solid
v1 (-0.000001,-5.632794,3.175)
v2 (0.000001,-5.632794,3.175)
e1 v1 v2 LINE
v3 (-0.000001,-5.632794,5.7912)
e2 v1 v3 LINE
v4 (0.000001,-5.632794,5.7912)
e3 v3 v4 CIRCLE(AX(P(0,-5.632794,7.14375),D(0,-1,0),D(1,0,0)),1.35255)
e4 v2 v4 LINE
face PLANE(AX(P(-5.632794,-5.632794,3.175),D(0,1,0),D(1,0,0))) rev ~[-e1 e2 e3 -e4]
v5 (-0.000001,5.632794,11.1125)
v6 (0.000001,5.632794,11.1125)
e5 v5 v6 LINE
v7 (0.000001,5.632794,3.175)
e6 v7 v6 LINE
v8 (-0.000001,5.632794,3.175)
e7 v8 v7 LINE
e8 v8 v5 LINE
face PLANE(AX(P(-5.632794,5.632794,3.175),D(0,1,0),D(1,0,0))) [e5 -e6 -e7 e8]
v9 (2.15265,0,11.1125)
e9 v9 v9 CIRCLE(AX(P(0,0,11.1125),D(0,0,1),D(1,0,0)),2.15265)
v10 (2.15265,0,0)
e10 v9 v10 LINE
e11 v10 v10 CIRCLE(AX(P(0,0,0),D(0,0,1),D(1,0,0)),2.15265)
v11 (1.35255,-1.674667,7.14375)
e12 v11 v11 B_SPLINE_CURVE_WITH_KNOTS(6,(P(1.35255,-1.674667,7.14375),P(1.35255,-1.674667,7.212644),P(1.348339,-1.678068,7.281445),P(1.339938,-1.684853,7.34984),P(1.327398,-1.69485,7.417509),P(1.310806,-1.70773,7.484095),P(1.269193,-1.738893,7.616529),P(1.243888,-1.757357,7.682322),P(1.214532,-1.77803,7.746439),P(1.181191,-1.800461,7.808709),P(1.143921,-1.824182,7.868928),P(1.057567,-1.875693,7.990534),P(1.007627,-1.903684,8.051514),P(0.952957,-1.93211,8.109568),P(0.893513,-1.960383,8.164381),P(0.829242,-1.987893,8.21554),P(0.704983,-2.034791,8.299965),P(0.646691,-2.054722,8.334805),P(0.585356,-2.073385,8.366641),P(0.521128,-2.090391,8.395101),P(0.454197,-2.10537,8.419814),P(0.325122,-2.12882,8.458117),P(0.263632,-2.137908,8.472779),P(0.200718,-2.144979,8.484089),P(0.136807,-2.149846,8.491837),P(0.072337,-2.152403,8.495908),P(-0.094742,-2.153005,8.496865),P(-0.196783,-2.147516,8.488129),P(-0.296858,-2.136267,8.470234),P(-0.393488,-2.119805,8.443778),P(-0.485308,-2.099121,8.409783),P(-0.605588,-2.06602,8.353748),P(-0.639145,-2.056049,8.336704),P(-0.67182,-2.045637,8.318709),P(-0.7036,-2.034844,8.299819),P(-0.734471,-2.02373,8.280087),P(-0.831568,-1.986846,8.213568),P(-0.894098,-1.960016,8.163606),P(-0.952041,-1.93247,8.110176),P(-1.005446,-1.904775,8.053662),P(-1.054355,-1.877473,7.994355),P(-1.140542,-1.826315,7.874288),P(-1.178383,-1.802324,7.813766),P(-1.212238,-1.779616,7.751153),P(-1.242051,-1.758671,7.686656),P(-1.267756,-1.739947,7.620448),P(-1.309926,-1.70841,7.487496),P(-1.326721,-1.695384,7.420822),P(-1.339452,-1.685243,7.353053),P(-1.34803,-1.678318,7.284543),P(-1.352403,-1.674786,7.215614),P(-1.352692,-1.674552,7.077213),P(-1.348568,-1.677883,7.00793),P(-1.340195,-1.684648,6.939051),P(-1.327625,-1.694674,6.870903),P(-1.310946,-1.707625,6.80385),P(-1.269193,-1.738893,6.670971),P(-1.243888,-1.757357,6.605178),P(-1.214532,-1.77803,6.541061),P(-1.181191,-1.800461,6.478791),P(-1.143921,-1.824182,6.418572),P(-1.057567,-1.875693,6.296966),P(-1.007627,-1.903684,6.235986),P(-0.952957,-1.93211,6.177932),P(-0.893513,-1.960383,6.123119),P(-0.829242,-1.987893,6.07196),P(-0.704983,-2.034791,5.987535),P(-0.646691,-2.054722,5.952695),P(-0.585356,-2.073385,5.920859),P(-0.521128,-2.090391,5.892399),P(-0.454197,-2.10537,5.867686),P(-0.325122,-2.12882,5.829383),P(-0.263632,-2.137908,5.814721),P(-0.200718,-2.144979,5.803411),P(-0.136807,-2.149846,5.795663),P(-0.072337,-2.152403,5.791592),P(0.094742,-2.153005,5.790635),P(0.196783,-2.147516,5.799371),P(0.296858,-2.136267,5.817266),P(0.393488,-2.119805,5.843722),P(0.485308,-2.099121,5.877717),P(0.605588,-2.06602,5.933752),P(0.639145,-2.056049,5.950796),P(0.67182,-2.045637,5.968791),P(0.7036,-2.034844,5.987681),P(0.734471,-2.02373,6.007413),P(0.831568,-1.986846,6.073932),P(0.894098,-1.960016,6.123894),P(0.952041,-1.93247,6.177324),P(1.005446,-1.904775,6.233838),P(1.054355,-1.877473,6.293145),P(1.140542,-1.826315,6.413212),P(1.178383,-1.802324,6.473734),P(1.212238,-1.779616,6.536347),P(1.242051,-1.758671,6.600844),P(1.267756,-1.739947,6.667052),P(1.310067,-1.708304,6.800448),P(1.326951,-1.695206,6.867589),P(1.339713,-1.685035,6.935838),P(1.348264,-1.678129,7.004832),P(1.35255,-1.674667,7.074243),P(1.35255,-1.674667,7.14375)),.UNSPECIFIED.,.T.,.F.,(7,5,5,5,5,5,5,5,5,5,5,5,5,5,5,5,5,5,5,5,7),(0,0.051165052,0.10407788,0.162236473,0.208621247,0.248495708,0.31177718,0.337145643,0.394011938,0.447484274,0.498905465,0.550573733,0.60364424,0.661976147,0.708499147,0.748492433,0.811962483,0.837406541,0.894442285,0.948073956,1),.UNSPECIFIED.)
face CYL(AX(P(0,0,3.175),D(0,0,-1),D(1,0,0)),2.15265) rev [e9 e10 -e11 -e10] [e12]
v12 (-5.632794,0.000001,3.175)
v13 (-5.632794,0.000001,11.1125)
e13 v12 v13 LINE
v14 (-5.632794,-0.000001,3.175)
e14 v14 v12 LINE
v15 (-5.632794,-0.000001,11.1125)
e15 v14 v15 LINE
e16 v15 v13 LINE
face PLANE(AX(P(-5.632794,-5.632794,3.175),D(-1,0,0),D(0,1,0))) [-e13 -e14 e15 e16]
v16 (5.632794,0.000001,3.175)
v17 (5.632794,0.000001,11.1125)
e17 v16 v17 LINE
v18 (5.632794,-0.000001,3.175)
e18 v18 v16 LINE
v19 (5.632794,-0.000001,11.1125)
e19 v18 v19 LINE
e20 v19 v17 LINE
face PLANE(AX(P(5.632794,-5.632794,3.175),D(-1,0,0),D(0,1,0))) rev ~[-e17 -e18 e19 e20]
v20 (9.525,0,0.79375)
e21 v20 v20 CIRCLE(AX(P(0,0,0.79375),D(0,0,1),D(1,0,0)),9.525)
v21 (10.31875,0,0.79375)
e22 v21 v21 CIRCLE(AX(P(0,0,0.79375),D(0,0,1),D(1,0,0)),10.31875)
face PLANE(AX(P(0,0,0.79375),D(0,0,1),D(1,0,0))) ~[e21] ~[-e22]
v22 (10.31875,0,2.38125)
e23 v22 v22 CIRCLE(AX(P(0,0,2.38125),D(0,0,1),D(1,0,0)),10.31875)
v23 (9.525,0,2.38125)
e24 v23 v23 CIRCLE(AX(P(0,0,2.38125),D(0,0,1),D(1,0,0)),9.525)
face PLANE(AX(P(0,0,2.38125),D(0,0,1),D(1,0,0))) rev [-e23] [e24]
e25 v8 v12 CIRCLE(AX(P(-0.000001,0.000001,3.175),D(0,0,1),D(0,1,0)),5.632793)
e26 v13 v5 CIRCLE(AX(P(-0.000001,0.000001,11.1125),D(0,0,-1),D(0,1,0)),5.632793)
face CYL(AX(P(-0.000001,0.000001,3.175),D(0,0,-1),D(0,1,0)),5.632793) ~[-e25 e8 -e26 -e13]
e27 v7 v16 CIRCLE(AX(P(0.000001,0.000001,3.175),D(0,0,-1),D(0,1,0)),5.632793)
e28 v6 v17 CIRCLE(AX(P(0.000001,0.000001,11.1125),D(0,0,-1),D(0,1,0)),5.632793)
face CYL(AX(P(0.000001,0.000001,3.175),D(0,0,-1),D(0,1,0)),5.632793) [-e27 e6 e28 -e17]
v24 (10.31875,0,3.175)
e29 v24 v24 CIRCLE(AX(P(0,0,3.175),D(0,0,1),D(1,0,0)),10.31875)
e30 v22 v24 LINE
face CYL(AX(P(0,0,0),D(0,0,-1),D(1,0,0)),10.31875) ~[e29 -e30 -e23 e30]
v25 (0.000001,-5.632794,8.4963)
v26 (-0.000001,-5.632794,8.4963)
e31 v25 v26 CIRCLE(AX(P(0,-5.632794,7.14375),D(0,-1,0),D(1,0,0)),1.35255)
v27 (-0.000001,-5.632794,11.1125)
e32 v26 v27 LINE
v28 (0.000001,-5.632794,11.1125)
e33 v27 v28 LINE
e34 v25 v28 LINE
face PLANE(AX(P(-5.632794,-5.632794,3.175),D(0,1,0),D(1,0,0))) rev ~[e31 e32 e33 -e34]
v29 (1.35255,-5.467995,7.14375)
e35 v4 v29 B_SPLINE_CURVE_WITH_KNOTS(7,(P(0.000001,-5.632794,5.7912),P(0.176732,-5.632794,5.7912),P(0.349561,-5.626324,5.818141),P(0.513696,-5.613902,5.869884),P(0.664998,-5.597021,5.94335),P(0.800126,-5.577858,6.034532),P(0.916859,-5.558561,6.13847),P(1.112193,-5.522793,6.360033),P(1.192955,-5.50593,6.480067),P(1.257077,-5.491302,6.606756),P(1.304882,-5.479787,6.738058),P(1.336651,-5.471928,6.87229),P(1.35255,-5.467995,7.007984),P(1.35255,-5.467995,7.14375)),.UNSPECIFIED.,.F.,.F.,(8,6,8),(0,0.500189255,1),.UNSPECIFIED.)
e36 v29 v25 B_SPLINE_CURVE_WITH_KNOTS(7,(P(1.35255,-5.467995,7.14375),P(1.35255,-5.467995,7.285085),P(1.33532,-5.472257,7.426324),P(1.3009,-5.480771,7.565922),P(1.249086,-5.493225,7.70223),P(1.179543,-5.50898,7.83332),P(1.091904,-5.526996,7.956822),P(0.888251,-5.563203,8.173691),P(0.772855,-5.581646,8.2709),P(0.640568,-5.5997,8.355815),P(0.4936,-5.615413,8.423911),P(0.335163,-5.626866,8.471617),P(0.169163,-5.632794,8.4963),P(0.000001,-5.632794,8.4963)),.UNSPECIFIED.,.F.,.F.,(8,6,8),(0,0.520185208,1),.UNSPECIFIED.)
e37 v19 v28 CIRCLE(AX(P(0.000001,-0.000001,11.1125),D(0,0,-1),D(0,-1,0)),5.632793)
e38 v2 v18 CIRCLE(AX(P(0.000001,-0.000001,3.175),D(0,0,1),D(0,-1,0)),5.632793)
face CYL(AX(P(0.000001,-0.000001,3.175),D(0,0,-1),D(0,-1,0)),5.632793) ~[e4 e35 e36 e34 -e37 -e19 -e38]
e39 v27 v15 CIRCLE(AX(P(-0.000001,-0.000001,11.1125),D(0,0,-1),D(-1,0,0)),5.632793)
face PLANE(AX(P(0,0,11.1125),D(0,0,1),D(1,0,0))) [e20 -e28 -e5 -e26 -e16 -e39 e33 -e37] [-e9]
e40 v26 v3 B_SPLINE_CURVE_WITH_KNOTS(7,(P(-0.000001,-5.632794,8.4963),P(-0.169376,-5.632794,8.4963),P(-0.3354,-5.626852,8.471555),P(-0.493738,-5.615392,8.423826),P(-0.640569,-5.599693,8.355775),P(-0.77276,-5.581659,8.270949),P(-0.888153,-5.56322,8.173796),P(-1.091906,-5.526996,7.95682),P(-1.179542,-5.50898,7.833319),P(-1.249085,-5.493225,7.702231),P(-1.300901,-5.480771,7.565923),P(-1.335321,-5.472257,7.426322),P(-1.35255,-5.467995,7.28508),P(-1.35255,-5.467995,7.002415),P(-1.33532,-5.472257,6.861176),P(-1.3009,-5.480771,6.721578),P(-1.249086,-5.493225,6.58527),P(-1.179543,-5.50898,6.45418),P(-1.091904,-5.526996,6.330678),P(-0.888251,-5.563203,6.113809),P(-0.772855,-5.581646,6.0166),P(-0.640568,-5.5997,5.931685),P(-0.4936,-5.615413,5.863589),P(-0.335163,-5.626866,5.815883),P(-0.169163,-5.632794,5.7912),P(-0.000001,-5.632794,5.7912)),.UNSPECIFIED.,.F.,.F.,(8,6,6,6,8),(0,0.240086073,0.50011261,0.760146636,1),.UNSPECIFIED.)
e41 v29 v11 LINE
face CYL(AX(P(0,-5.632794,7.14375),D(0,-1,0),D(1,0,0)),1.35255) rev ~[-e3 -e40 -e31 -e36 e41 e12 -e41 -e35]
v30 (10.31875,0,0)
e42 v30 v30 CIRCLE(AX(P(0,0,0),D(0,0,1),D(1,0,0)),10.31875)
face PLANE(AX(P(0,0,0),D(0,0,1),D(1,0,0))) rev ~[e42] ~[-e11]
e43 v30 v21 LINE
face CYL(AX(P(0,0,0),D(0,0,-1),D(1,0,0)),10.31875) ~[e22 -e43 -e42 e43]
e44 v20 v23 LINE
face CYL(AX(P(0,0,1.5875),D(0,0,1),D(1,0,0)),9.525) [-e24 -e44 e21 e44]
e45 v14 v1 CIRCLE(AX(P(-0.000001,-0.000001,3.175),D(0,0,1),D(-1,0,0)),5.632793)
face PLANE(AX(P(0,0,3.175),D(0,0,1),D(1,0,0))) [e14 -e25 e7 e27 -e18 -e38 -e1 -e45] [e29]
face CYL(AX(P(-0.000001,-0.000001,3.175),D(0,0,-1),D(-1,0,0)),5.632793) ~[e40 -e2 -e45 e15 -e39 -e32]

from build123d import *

# Parameters (mm, degrees)
F0_R        = 10.31875
F0_R_2      = 2.15265
F1_DEPTH    = 3.175
F2_W        = 11.2655872395
F2_H        = 11.2655872395
F2_R        = 2.15265
F3_DEPTH    = 7.9375
F4_R        = 1.35255
F5_REACH    = 19.7781327273
F6_T1_DEPTH = 22.01948225
F7_W        = 0.79375
F7_H        = 1.5875


# Not quite as in the source:
# - a fillet or chamfer that OpenCascade refuses, or shapes differently, is made with other operations: its cross-section is extruded or revolved along the edge and cut away or added


with BuildPart() as f1:
    # F0 (on Top) → F1 (new body)
    with BuildSketch(Plane.XY):
        Circle(F0_R)
        Circle(F0_R_2, mode=Mode.SUBTRACT)
    extrude(amount=F1_DEPTH)

    # F2 (on face) → F3 (join)
    with BuildSketch(Plane.XY.offset(3.175)):
        Rectangle(F2_W, F2_H)
        Circle(F2_R, mode=Mode.SUBTRACT)
    extrude(amount=F3_DEPTH)

    f5_end = f1.faces().sort_by_distance((-2.15265, 0, 5.55625))[0]
    # F4 (on face) → F5 (cut, up to a face of the model that its end follows)
    with BuildSketch(Plane.XZ.offset(5.6327936197)):
        with Locations((0, 7.14375)):
            Circle(F4_R)
    f5_long = extrude(amount=-F5_REACH, mode=Mode.PRIVATE)
    add(split(f5_long, bisect_by=f5_end, keep=Keep.ALL, mode=Mode.PRIVATE).solids().sort_by_distance((0, -5.6327936197, 7.14375))[0], mode=Mode.SUBTRACT)

    # F6: fillet of radius 5.6327929 on 4 edges, made by hand

    # F6_s2 → F6_t1 (cut)
    with BuildSketch(Plane.XY.offset(3.175)):
        with BuildLine():
            ThreePointArc((-5.6327936197, -7.197e-07), (-3.9829867763, -3.9829867763), (-7.197e-07, -5.6327936197))
            Line((-7.197e-07, -5.6327936197), (-5.6327936197, -5.6327936197))
            Line((-5.6327936197, -5.6327936197), (-5.6327936197, -7.197e-07))
        make_face()
        with BuildLine():
            ThreePointArc((7.197e-07, -5.6327936197), (3.9829867763, -3.9829867763), (5.6327936197, -7.197e-07))
            Line((5.6327936197, -7.197e-07), (5.6327936197, -5.6327936197))
            Line((5.6327936197, -5.6327936197), (7.197e-07, -5.6327936197))
        make_face()
        with BuildLine():
            ThreePointArc((7.197e-07, 5.6327936197), (3.9829867763, 3.9829867763), (5.6327936197, 7.197e-07))
            Line((5.6327936197, 7.197e-07), (5.6327936197, 5.6327936197))
            Line((5.6327936197, 5.6327936197), (7.197e-07, 5.6327936197))
        make_face()
        with BuildLine():
            ThreePointArc((-7.197e-07, 5.6327936197), (-3.9829867763, 3.9829867763), (-5.6327936197, 7.197e-07))
            Line((-5.6327936197, 7.197e-07), (-5.6327936197, 5.6327936197))
            Line((-5.6327936197, 5.6327936197), (-7.197e-07, 5.6327936197))
        make_face()
    extrude(amount=F6_T1_DEPTH, mode=Mode.SUBTRACT)

    # F7 (on Front) → F8 (revolve, cut)
    with BuildSketch(Plane.XZ):
        with Locations((9.921875, 1.5875)):
            Rectangle(F7_W, F7_H)
    revolve(axis=Axis((0, 0, 0), (0, 0, 1)), mode=Mode.SUBTRACT)


solid = f1.part
